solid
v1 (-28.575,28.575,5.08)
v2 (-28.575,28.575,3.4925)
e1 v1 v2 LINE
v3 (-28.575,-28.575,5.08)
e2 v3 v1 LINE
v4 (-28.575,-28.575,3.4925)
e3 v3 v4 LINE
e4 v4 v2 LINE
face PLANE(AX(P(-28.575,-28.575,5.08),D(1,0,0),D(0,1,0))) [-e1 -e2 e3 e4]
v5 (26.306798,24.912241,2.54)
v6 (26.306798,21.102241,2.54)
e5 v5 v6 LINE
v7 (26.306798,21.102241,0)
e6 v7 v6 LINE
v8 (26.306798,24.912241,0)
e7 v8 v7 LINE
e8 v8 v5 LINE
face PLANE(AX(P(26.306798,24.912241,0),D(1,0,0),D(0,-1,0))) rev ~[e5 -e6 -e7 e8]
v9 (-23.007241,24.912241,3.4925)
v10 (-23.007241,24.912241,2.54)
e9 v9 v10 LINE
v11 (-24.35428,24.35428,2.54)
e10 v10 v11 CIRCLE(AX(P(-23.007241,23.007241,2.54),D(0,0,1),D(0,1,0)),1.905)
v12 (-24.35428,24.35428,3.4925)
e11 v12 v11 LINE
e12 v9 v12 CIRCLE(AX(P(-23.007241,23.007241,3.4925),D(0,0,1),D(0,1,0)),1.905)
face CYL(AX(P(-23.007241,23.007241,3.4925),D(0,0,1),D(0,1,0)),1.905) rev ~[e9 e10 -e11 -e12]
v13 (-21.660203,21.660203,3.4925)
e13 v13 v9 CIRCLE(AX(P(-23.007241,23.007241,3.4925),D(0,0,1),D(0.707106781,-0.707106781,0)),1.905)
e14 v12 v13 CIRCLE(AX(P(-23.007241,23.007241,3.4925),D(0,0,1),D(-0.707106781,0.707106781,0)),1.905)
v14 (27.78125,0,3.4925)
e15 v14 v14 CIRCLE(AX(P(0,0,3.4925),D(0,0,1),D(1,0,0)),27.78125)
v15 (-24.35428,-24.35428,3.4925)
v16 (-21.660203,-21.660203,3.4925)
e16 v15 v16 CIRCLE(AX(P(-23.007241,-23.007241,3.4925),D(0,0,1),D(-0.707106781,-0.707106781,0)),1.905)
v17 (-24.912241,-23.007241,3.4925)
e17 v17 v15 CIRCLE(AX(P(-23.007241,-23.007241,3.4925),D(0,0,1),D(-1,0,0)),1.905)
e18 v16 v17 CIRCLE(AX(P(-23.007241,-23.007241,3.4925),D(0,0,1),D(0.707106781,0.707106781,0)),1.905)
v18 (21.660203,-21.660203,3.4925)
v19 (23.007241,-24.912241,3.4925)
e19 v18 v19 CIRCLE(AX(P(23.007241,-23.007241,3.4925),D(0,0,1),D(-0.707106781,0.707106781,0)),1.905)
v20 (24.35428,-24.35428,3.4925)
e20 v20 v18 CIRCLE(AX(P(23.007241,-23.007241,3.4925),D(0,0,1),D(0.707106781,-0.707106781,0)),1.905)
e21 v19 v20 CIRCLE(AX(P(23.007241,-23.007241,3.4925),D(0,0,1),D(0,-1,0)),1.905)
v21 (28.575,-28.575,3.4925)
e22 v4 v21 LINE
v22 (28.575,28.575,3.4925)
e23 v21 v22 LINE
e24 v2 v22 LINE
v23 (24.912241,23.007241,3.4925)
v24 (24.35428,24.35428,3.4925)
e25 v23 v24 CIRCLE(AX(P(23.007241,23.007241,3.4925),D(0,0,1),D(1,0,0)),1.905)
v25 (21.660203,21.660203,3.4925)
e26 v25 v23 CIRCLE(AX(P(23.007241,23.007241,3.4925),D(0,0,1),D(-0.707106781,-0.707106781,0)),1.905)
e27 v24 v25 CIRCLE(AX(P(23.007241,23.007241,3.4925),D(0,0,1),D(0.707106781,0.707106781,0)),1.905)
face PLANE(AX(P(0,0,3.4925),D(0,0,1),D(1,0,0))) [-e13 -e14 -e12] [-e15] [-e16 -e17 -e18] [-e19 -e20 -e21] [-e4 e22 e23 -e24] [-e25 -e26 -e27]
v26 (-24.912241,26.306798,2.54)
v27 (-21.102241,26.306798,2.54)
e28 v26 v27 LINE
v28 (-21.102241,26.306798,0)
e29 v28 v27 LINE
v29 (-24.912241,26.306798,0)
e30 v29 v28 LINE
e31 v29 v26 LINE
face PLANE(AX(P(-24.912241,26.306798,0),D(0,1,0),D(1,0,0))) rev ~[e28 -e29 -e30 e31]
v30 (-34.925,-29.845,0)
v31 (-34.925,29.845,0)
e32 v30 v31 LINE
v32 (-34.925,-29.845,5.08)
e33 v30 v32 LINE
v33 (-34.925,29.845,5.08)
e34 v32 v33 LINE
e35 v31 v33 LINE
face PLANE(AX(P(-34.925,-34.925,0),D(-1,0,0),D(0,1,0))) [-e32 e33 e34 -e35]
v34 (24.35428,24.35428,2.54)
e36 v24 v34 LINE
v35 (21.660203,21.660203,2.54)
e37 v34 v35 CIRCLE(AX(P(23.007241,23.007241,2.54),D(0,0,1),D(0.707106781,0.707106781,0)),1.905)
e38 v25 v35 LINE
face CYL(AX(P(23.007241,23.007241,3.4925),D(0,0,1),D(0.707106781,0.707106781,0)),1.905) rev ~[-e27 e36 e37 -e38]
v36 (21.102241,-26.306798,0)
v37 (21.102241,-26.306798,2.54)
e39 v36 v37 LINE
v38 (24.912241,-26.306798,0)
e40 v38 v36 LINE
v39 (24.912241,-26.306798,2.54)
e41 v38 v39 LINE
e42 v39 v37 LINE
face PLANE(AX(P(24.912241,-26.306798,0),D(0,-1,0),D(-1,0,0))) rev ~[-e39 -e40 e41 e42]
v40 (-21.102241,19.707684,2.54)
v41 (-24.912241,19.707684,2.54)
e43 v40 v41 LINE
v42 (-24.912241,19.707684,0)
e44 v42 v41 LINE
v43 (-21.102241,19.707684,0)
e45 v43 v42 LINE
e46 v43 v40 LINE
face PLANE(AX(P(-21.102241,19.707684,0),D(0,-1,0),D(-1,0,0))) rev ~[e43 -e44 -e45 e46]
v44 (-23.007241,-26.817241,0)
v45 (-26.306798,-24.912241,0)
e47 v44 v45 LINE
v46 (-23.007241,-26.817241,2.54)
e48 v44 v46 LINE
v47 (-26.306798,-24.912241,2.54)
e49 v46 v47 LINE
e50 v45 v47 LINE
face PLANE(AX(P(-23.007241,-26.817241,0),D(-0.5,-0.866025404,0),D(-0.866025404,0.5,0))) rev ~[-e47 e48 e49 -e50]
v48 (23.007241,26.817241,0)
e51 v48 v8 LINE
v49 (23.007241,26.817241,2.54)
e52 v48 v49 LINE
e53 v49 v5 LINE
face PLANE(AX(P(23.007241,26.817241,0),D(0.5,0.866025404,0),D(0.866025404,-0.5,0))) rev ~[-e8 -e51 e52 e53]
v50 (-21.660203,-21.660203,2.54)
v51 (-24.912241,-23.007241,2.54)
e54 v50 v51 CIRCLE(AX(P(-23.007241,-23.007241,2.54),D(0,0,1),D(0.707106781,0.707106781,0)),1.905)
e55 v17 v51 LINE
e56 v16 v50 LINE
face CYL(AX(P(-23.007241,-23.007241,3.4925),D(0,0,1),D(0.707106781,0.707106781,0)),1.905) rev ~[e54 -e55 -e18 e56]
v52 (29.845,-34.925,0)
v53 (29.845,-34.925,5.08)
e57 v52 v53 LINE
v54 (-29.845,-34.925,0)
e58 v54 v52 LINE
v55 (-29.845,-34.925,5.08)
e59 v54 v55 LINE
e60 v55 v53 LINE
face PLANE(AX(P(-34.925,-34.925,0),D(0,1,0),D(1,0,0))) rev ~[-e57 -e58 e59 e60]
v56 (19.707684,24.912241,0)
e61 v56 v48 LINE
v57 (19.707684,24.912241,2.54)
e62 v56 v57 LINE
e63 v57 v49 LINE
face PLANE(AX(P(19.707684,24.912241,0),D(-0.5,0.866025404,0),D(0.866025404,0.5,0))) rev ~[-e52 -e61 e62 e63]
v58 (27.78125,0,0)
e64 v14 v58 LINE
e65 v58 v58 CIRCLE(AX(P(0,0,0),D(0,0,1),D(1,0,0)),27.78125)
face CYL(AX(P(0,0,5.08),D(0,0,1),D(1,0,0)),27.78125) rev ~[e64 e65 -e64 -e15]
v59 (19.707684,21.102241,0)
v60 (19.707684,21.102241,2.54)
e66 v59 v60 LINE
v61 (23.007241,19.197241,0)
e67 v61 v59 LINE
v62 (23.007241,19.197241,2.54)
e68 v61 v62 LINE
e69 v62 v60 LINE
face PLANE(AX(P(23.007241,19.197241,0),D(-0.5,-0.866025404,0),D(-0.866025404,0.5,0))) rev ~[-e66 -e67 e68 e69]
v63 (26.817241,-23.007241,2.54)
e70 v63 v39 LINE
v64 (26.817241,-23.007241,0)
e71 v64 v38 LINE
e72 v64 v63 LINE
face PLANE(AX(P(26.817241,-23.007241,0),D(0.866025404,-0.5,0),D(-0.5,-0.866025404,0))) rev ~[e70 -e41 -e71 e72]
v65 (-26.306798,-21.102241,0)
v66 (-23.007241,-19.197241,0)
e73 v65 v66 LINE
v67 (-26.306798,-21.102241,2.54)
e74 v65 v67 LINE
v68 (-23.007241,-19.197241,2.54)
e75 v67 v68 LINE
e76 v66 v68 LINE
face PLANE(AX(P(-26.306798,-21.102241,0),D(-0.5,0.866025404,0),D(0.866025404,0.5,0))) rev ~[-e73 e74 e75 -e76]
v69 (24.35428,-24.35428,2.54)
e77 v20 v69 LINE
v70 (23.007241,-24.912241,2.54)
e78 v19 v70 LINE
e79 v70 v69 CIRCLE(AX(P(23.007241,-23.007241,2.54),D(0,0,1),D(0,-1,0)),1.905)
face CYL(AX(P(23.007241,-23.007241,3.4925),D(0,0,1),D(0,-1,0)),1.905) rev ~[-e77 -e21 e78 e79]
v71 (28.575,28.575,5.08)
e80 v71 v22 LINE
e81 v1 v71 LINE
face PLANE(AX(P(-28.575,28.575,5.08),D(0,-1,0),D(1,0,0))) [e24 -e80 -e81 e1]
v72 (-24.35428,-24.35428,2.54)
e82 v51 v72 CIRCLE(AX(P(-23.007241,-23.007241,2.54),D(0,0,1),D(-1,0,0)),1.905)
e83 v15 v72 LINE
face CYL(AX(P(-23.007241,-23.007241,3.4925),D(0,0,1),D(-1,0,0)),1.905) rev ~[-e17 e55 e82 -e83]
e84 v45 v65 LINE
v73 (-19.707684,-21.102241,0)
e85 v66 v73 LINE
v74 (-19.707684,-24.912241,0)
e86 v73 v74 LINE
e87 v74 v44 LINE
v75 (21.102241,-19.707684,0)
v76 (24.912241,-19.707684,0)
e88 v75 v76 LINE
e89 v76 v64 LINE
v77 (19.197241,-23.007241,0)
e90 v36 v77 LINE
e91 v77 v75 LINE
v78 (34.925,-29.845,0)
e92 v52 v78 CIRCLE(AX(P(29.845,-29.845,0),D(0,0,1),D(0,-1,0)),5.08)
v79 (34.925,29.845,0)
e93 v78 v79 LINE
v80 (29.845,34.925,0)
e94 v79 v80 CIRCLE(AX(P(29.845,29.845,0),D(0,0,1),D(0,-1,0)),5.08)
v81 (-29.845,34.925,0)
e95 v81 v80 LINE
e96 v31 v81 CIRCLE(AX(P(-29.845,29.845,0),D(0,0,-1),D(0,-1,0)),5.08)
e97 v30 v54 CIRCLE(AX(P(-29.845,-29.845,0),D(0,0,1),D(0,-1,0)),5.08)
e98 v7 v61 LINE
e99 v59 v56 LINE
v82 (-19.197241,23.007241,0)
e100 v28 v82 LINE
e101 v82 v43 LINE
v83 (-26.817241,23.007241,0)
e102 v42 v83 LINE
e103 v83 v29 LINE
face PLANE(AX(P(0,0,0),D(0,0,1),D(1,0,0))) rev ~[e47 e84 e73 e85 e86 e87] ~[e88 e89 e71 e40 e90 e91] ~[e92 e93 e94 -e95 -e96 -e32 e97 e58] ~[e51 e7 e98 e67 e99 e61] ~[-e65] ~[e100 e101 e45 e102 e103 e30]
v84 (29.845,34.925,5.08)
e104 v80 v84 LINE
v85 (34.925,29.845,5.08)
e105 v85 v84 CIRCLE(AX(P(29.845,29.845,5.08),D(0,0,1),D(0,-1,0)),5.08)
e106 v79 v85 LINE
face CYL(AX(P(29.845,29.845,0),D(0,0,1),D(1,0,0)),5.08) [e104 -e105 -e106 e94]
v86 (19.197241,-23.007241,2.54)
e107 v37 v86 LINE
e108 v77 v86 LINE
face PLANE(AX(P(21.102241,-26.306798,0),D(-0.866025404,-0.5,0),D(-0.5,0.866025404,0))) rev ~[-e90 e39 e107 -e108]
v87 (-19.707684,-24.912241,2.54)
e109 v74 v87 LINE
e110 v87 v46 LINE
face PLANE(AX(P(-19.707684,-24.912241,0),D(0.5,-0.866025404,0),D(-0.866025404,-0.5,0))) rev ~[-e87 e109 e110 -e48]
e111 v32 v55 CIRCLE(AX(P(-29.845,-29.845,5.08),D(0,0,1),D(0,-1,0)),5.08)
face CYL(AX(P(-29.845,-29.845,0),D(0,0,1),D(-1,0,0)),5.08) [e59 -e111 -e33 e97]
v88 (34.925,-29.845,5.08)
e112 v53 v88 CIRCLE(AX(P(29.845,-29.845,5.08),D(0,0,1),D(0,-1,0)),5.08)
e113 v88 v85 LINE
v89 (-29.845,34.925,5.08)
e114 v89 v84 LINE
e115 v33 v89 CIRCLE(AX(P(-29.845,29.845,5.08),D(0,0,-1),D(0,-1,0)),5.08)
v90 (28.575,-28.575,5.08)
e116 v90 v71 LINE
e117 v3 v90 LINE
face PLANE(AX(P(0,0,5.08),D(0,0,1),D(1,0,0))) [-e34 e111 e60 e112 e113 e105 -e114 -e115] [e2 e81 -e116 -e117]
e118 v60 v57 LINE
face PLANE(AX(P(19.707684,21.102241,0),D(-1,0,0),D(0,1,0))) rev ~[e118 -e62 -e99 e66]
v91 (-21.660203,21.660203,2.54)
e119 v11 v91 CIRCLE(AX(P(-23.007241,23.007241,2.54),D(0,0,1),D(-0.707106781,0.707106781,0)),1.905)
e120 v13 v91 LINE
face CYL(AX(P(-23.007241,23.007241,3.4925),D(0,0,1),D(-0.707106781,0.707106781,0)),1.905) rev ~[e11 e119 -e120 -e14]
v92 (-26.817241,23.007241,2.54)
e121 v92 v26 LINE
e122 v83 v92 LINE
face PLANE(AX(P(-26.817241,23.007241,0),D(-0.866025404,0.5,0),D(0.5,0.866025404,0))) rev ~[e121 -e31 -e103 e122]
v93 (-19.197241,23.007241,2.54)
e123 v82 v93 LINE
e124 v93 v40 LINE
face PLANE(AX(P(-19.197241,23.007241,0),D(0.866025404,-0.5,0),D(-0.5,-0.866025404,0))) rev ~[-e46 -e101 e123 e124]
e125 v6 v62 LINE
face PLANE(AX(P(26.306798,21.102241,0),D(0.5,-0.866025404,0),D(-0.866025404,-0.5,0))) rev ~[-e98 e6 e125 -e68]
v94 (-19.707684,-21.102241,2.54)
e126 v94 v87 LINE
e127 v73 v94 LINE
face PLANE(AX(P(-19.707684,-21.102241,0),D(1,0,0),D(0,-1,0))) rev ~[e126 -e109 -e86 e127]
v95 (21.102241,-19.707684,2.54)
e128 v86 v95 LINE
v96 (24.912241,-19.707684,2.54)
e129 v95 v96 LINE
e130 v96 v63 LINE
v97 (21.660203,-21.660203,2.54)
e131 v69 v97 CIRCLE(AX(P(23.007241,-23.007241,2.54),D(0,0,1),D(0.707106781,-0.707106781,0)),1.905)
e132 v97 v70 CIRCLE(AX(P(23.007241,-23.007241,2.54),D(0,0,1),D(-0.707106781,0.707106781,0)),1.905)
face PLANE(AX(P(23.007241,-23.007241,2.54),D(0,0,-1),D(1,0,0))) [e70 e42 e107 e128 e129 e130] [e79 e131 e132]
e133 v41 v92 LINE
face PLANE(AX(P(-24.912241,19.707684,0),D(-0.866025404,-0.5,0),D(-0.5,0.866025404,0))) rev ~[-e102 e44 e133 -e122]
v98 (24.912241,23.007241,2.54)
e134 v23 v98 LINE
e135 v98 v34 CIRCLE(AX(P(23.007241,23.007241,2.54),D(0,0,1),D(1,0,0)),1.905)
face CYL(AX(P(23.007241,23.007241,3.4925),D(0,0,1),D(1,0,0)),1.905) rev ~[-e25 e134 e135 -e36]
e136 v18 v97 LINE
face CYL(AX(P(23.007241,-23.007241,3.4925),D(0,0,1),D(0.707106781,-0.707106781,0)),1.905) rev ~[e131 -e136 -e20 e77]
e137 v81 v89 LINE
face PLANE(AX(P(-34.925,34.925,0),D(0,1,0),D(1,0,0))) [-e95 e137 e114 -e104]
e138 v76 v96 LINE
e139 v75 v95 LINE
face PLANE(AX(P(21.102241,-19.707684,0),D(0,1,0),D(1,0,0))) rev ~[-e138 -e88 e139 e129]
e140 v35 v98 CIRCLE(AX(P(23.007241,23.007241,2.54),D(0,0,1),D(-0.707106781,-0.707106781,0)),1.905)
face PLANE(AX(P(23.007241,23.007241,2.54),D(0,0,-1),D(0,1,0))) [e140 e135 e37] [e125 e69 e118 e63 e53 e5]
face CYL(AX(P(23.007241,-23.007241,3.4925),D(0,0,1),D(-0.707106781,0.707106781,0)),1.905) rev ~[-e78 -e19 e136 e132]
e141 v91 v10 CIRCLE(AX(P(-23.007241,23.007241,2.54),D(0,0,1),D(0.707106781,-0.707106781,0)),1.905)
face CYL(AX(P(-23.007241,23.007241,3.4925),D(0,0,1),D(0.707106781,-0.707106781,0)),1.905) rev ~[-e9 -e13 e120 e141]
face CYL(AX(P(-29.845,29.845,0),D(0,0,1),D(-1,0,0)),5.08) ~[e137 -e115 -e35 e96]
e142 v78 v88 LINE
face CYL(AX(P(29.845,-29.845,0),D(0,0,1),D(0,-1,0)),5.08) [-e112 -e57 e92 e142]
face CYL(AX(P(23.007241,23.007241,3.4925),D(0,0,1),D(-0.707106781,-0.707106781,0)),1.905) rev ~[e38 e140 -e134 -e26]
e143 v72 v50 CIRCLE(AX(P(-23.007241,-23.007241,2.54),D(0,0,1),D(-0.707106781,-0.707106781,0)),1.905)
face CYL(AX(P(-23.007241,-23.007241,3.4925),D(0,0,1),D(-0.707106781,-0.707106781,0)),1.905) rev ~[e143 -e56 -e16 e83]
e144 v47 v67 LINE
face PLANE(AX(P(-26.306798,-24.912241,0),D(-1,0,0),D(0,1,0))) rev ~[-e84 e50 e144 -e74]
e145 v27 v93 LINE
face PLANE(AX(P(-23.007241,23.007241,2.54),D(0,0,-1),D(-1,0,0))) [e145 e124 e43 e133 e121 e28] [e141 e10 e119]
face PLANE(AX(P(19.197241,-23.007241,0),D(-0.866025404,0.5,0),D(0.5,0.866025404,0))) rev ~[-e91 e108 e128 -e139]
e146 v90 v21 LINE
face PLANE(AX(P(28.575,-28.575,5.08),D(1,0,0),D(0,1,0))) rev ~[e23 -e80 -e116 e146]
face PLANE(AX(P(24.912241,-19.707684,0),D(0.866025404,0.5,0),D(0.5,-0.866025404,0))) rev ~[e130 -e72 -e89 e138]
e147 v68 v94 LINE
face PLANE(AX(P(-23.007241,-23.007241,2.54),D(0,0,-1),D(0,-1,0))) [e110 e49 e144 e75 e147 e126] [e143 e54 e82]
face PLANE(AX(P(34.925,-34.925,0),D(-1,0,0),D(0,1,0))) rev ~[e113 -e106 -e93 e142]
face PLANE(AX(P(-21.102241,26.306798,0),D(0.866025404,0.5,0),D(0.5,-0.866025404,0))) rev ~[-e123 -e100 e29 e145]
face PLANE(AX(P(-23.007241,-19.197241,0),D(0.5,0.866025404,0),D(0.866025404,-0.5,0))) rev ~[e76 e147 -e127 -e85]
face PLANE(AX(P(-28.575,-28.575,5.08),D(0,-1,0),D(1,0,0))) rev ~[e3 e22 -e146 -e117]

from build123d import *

# Parameters (mm, degrees)
F0_W             = 69.85
F0_H             = 69.85
F1_DEPTH         = 5.08
F2_R             = 5.08
F3_R             = 27.78125
F4_DEPTH         = 5.08
F5_W             = 57.15
F5_H             = 57.15
F6_DEPTH         = 1.5875
F8_DEPTH         = 3.4925
F8_COPIES_COUNT  = 4
F11_DEPTH        = 2.54
F11_COPIES_COUNT = 4


# Not quite as in the source:
# - a pattern or mirror of a feature is missing from the dataset's text; its kind, count and spacing are read off the source's solid


with BuildPart() as f1:
    # F0 (on Top) → F1 (new body)
    with BuildSketch(Plane.XY):
        Rectangle(F0_W, F0_H)
    extrude(amount=F1_DEPTH)

    # F2
    f2_edges = [f1.edges().sort_by_distance(p)[0] for p in [
        (-34.925, -34.925, 2.54),
        (34.925, -34.925, 2.54),
        (34.925, 34.925, 2.54),
        (-34.925, 34.925, 2.54),
    ]]
    fillet(f2_edges, radius=F2_R)

    # F3 (on face) → F4 (cut, through all)
    with BuildSketch(Plane.XY.offset(5.08)):
        Circle(F3_R)
    extrude(amount=-F4_DEPTH, mode=Mode.SUBTRACT)

    # F5 (on face) → F6 (cut)
    with BuildSketch(Plane.XY.offset(5.08)):
        Rectangle(F5_W, F5_H)
    extrude(amount=-F6_DEPTH, mode=Mode.SUBTRACT)

    # F7 (on face) → F8 (cut, through all)
    with BuildSketch(Plane.XY.offset(3.4925)):
        with BuildLine():
            Line((21.6602027868, 21.6602027868), (24.3542796231, 24.3542796231))
            ThreePointArc((24.3542796231, 24.3542796231), (21.6602027868, 24.3542796231), (21.6602027868, 21.6602027868))
        make_face()
        with BuildLine():
            ThreePointArc((24.9122412049, 23.0072412049), (24.7672317144, 23.7362531436), (24.3542796231, 24.3542796231))
            Line((24.3542796231, 24.3542796231), (21.6602027868, 21.6602027868))
            ThreePointArc((21.6602027868, 21.6602027868), (23.7362531436, 21.2472506955), (24.9122412049, 23.0072412049))
        make_face()
    f8 = extrude(amount=-F8_DEPTH, mode=Mode.SUBTRACT)

    # F8_copies: F8 ×4 about axis
    f8_copies_axis = Axis((0, 0, 0), (0, 0, 1))
    for i in range(1, F8_COPIES_COUNT):
        add(f8.rotate(f8_copies_axis, i * 360 / F8_COPIES_COUNT), mode=Mode.SUBTRACT)

    # F10 (on face) → F11 (cut)
    with BuildSketch(Plane(origin=(0, 0, 0), x_dir=(1, 0, 0), z_dir=(0, 0, -1))):
        Polygon((26.8172412049, 23.0072412049), (24.9122412049, 26.3067979934), (21.1022412049, 26.3067979934), (19.1972412049, 23.0072412049), (21.1022412049, 19.7076844165), (24.9122412049, 19.7076844165), align=None)
    f11 = extrude(amount=-F11_DEPTH, mode=Mode.SUBTRACT)

    # F11_copies: F11 ×4 about axis
    f11_copies_axis = Axis((0, 0, 0), (0, 0, 1))
    for i in range(1, F11_COPIES_COUNT):
        add(f11.rotate(f11_copies_axis, i * 360 / F11_COPIES_COUNT), mode=Mode.SUBTRACT)


solid = f1.part
